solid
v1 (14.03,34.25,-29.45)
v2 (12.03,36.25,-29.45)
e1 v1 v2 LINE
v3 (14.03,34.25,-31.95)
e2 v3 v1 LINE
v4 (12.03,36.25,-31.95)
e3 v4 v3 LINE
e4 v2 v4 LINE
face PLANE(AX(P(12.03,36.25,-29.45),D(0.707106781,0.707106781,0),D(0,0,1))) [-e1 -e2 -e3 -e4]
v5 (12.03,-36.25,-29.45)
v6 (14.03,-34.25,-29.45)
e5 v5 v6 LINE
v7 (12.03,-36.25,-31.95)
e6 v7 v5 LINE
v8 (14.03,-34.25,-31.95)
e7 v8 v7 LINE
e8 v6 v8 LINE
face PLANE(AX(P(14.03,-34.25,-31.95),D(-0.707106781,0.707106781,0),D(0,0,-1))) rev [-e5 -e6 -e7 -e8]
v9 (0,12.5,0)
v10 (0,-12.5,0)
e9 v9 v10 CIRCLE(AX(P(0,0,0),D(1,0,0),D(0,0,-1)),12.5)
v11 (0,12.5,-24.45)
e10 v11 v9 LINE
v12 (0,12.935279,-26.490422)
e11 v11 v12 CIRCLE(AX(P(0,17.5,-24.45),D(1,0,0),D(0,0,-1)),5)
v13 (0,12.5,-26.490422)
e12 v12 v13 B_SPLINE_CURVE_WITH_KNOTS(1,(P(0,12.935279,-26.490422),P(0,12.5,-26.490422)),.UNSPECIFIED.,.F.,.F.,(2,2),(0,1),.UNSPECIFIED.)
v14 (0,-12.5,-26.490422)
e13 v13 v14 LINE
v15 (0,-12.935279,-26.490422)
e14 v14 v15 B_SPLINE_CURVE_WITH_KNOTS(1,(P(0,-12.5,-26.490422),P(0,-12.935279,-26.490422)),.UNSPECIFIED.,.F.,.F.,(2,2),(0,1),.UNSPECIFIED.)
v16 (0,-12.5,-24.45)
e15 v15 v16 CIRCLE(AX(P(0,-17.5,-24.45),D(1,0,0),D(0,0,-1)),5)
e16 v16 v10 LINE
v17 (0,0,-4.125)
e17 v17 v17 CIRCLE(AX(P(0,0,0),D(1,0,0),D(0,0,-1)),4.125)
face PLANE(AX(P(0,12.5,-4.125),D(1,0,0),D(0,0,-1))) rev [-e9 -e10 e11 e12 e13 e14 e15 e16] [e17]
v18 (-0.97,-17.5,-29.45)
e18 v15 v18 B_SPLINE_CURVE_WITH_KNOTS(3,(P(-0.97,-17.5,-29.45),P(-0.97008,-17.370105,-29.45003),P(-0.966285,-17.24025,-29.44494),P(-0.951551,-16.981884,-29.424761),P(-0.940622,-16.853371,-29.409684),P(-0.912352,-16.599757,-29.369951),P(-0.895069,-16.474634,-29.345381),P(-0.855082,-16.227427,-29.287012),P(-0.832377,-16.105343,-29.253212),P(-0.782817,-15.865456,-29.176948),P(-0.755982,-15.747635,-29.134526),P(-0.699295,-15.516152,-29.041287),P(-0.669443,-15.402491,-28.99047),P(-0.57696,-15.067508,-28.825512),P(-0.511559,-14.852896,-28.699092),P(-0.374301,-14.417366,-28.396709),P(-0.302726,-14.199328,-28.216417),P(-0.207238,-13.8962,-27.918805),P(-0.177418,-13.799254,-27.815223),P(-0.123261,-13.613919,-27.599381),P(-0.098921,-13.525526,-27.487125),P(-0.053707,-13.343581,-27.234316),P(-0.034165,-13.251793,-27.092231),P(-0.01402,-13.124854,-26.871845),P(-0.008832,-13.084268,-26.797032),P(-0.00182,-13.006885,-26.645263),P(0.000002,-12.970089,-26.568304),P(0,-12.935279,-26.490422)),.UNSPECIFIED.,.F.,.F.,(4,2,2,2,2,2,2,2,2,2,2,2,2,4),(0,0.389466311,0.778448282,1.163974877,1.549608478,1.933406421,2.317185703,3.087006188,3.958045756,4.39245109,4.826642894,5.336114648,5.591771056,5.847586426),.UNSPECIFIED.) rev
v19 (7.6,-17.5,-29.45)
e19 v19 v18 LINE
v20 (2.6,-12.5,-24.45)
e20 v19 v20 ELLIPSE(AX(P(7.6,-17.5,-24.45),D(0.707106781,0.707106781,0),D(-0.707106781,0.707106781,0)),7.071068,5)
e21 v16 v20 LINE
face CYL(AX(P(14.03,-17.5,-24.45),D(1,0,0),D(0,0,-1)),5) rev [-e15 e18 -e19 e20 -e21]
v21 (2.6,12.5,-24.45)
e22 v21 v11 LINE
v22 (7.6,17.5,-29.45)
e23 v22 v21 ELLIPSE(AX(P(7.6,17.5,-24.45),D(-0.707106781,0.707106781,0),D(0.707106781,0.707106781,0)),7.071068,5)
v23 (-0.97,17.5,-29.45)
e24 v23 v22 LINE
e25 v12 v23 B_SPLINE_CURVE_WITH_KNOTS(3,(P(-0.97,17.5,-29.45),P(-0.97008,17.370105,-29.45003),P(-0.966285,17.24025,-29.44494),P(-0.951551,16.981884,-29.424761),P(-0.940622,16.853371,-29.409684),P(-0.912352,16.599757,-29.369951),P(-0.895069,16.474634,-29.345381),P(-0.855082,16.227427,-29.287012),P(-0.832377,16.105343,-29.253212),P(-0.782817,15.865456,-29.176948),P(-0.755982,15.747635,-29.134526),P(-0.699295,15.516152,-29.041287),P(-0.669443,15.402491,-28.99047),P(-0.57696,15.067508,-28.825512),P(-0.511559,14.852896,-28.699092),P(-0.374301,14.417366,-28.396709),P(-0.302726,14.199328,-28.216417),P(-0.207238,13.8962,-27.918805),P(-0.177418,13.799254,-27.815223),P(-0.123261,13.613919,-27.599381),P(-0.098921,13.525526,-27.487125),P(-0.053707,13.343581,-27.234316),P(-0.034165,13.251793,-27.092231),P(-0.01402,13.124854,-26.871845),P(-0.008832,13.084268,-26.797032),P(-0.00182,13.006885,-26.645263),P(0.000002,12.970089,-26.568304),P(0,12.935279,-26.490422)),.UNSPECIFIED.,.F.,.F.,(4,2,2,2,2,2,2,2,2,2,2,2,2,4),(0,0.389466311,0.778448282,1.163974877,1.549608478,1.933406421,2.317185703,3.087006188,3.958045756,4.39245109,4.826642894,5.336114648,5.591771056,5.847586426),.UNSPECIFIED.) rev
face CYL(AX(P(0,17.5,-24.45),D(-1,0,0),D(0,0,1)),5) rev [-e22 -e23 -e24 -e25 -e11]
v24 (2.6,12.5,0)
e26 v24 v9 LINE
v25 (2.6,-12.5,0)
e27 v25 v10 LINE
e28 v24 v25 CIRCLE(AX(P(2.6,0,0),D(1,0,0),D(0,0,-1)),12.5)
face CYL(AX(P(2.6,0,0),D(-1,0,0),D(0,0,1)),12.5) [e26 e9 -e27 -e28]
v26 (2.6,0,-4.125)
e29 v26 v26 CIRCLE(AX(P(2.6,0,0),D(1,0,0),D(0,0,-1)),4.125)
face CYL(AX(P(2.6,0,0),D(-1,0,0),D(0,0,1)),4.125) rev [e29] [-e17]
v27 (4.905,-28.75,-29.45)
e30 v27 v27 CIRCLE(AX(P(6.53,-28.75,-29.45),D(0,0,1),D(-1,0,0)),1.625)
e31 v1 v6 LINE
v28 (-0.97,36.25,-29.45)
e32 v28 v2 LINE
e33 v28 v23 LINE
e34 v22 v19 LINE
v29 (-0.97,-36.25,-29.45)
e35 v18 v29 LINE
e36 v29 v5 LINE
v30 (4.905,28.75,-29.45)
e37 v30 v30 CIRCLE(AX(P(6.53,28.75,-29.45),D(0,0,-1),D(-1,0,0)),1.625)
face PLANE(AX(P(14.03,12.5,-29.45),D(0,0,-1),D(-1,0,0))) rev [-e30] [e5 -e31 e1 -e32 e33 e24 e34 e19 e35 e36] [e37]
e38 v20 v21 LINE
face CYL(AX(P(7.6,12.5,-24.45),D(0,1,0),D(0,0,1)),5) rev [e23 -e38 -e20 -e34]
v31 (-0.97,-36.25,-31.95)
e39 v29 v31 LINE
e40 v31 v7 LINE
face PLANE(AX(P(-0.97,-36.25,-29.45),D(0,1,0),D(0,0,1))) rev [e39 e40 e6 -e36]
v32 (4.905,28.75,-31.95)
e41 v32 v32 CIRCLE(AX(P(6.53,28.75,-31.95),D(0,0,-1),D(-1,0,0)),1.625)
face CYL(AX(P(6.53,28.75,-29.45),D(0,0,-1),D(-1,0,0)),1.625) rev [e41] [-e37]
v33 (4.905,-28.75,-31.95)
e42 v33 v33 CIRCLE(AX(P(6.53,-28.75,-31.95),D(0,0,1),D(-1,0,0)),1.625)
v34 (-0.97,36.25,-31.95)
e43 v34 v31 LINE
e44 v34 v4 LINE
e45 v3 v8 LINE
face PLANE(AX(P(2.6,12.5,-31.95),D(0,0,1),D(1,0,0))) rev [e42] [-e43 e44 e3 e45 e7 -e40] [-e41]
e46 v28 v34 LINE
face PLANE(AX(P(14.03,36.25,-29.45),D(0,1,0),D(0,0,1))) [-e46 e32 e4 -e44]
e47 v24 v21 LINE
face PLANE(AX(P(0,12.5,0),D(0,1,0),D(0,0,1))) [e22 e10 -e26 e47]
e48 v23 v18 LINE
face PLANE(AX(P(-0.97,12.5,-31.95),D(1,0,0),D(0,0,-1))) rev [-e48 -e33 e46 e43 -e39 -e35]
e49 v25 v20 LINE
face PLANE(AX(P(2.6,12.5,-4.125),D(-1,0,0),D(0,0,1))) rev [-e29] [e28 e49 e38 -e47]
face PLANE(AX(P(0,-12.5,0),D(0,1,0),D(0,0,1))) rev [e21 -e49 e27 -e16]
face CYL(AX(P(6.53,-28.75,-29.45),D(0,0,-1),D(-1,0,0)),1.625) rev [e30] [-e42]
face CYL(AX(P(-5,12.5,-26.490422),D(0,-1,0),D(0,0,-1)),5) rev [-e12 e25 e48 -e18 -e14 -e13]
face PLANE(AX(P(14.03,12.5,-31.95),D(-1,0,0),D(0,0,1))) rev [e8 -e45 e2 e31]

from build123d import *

# Parameters (mm, degrees)
SKETCH1_R               = 4.125
BOSS_EXTRUDE1_DEPTH     = 2.6
BOSS_EXTRUDE4_DEPTH     = 2.5
CUT_EXTRUDE2_REACH      = 80.314
SKETCH7_W               = 7
SKETCH7_H               = 16.5
SKETCH7_W_2             = 16
SKETCH7_H_2             = 8
CUT_EXTRUDE3_REACH      = 82.041
SKETCH9_W               = 2.6
SKETCH9_H               = 22.388822383
SKETCH8_W               = 2.6
SKETCH8_H               = 27.825
BOSS_EXTRUDE5_DEPTH     = 12.5
FILLET2_R               = 1
FILLET3_R               = 4
CUT_EXTRUDE4_DEPTH      = 74.103052287
CUT_EXTRUDE4_DEPTH_BACK = 74.103052287
SKETCH10_W              = 78.235731334
SKETCH10_H              = 6.290045588
SKETCH11_W              = 15
SKETCH11_H              = 2.5
BOSS_EXTRUDE6_DEPTH     = 12.5
BOSS_EXTRUDE7_DEPTH     = 2.5
SKETCH14_R              = 1.625
CUT_EXTRUDE5_DEPTH      = 2.5
FILLET4_R               = 5
CHAMFER1_SIZE           = 2


with BuildPart() as part:
    # Sketch1 → Boss-Extrude1 (new body)
    with BuildSketch(Plane(origin=(0, 0, 0), x_dir=(0, 0, -1), z_dir=(1, 0, 0))):
        with BuildLine():
            Line((0, 12.5), (34.45, 12.5))
            Line((34.45, 12.5), (34.45, -12.5))
            Line((34.45, -12.5), (0, -12.5))
            ThreePointArc((0, -12.5), (-12.5, 0), (0, 12.5))
        make_face()
        Circle(SKETCH1_R, mode=Mode.SUBTRACT)
    extrude(amount=BOSS_EXTRUDE1_DEPTH)

    # Sketch6 → Boss-Extrude4 (add)
    with BuildSketch(Plane(origin=(0, 0, -34.45), x_dir=(-1, 0, 0), z_dir=(0, 0, -1))):
        Polygon((-8.812505246, 36.25), (53.321583376, 36.25), (53.321583376, -36.25), (6.25, -36.25), (-19.178416624, -36.25), (-19.178416624, 36.25), align=None)
    extrude(amount=-BOSS_EXTRUDE4_DEPTH)

    # Sketch7 → Cut-Extrude2 (cut, up to next)
    with BuildSketch(Plane.XY.offset(-31.95), mode=Mode.PRIVATE) as cut_extrude2_sk1:
        with Locations((-1.711858899, -11.632438111)):
            Rectangle(SKETCH7_W, SKETCH7_H)
    cut_extrude2_tool1 = extrude(cut_extrude2_sk1.sketch, amount=-CUT_EXTRUDE2_REACH, mode=Mode.PRIVATE) & part.part
    # Sketch7 → Cut-Extrude2 (cut, up to next)
    with BuildSketch(Plane.XY.offset(-31.95), mode=Mode.PRIVATE) as cut_extrude2_sk2:
        with Locations((-16.5, 0)):
            Rectangle(SKETCH7_W_2, SKETCH7_H_2)
    cut_extrude2_tool2 = extrude(cut_extrude2_sk2.sketch, amount=-CUT_EXTRUDE2_REACH, mode=Mode.PRIVATE) & part.part
    add(cut_extrude2_tool1.solids().sort_by_distance((-1.711859, -11.632438, -31.95))[0], mode=Mode.SUBTRACT)
    add(cut_extrude2_tool2.solids().sort_by_distance((-16.5, 0, -31.95))[0], mode=Mode.SUBTRACT)

    # Sketch9 → Cut-Extrude3 (cut, up to next)
    with BuildSketch(Plane.XZ.offset(12.5), mode=Mode.PRIVATE) as cut_extrude3_sk1:
        with Locations((1.3, -20.755588809)):
            Rectangle(SKETCH9_W, SKETCH9_H)
    cut_extrude3_tool1 = extrude(cut_extrude3_sk1.sketch, amount=-CUT_EXTRUDE3_REACH, mode=Mode.PRIVATE) & part.part
    add(cut_extrude3_tool1.solids().sort_by_distance((1.3, -12.5, -20.755589))[0], mode=Mode.SUBTRACT)


with BuildPart() as cut_extrude3_piece_1:
    # of the separate pieces the step leaves, piece 1, a body of its own (cut_extrude3_pieces)
    add(part.part.solids().sort_by_distance((-53.321583376, 36.25, -31.95))[0])



with BuildPart() as cut_extrude3_piece_2:
    # of the separate pieces the step leaves, piece 2, a body of its own (cut_extrude3_pieces)
    add(part.part.solids().sort_by_distance((0, 12.5, 0))[0])


with BuildPart() as cut_extrude3_piece_1_1:
    add(cut_extrude3_piece_1.part)

    add(cut_extrude3_piece_2.part)  # Boss-Extrude5 merges Cut-Extrude3 piece 2
    # Sketch8 → Boss-Extrude5 (add, symmetric)
    with BuildSketch(Plane(origin=(0, 0, 0), x_dir=(1, 0, 0), z_dir=(0, 1, 0))):
        with Locations((1.3, 18.0375)):
            Rectangle(SKETCH8_W, SKETCH8_H)
    extrude(amount=BOSS_EXTRUDE5_DEPTH, both=True)

    # Fillet2
    fillet2_edges = [cut_extrude3_piece_1_1.edges().sort_by_distance(p)[0] for p in [
        (-8.5, 4, -33.2),
        (-8.5, -4, -33.2),
        (-24.5, -4, -33.2),
        (-24.5, 4, -33.2),
        (-5.211858899, -19.882438111, -33.2),
        (-5.211858899, -3.382438111, -33.2),
        (1.788141101, -3.382438111, -33.2),
        (1.788141101, -19.882438111, -33.2),
    ]]
    fillet(fillet2_edges, radius=FILLET2_R)

    # Fillet3
    fillet3_edges = [cut_extrude3_piece_1_1.edges().sort_by_distance(p)[0] for p in [
        (19.178416624, 36.25, -33.2),
        (-53.321583376, 36.25, -33.2),
        (-53.321583376, -36.25, -33.2),
        (19.178416624, -36.25, -33.2),
    ]]
    fillet(fillet3_edges, radius=FILLET3_R)

    # Sketch10 → Cut-Extrude4 (cut, two sides: drawn at the far end of the back side and taken through both)
    with BuildSketch(Plane(origin=(0, 0, 0), x_dir=(1, 0, 0), z_dir=(0, 1, 0)).offset(-CUT_EXTRUDE4_DEPTH_BACK)):
        with Locations((-17.391929865, 35.095022794)):
            Rectangle(SKETCH10_W, SKETCH10_H)
    extrude(amount=CUT_EXTRUDE4_DEPTH + CUT_EXTRUDE4_DEPTH_BACK, mode=Mode.SUBTRACT)

    # Sketch11 → Boss-Extrude6 (add, symmetric)
    with BuildSketch(Plane(origin=(0, 0, 0), x_dir=(1, 0, 0), z_dir=(0, 1, 0))):
        with Locations((6.53, 30.7)):
            Rectangle(SKETCH11_W, SKETCH11_H)
    boss_extrude6 = extrude(amount=BOSS_EXTRUDE6_DEPTH, both=True)

    # Sketch13 → Boss-Extrude7 (add)
    with BuildSketch(Plane(origin=(0, 0, -31.95), x_dir=(-1, 0, 0), z_dir=(0, 0, -1))):
        Polygon((-14.03, 12.5), (0.97, 12.5), (0.97, 36.25), (-10.03, 36.25), (-14.03, 36.25), (-14.03, 32.25), align=None)
    boss_extrude7 = extrude(amount=-BOSS_EXTRUDE7_DEPTH)

    # Mirror1: Boss-Extrude6, Boss-Extrude7 across plane
    add(boss_extrude6.mirror(Plane.ZX))
    add(boss_extrude7.mirror(Plane.ZX))

    # Sketch14 → Cut-Extrude5 (cut)
    with BuildSketch(Plane(origin=(0, 0, -31.95), x_dir=(-1, 0, 0), z_dir=(0, 0, -1))):
        with Locations((-6.53, 28.75)):
            Circle(SKETCH14_R)
    cut_extrude5 = extrude(amount=-CUT_EXTRUDE5_DEPTH, mode=Mode.SUBTRACT)

    # Mirror2: Cut-Extrude5 across plane
    add(cut_extrude5.mirror(Plane.ZX), mode=Mode.SUBTRACT)

    # Fillet4
    # the kernel refuses this fillet: 5 mm, written as the material it adds along each edge
    with BuildSketch(Plane(origin=(2.6, -12.5, -29.45), x_dir=(1, 0, 0), z_dir=(0, 1, 0))) as fillet4_piece_1:
        with BuildLine():
            CenterArc((FILLET4_R, -FILLET4_R), FILLET4_R, 90, 90)
            Line((0, -FILLET4_R), (-FILLET4_R * 0.02, -FILLET4_R))
            Line((-FILLET4_R * 0.02, -FILLET4_R), (-FILLET4_R * 0.02, FILLET4_R * 0.02))
            Line((-FILLET4_R * 0.02, FILLET4_R * 0.02), (FILLET4_R, FILLET4_R * 0.02))
            Line((FILLET4_R, FILLET4_R * 0.02), (FILLET4_R, 0))
        make_face()
    extrude(amount=25)
    with BuildSketch(Plane(origin=(0, -12.5, -29.45), x_dir=(-1, 0, 0), z_dir=(0, 1, 0))) as fillet4_piece_2:
        with BuildLine():
            CenterArc((5, 2.959577673), FILLET4_R, 180, 36.293058493)
            Line((0, 2.959577673), (-0.1, 2.959577673))
            Line((-0.1, 2.959577673), (-0.1, 0))
            Line((-0.1, 0), (0, -0.1))
            ThreePointArc((0, -0.1), (0.485, -0.1), (0.8894, -0.059191553))
            Line((0.8894, -0.059191553), (0.97, 0))
        make_face()
    extrude(amount=25)
    with BuildSketch(Plane(origin=(2.6, 12.5, -29.45), x_dir=(0, 0, 1), z_dir=(-1, 0, 0)), Plane(origin=(2.6, -12.5, -29.45), x_dir=(0, -1, 0), z_dir=(-1, 0, 0))) as fillet4_piece_3:
        with BuildLine():
            CenterArc((FILLET4_R, FILLET4_R), FILLET4_R, 180, 90)
            Line((0, FILLET4_R), (-FILLET4_R * 0.02, FILLET4_R))
            Line((-FILLET4_R * 0.02, FILLET4_R), (-FILLET4_R * 0.02, -FILLET4_R * 0.02))
            Line((-FILLET4_R * 0.02, -FILLET4_R * 0.02), (FILLET4_R, -FILLET4_R * 0.02))
            Line((FILLET4_R, -FILLET4_R * 0.02), (FILLET4_R, 0))
        make_face()
    extrude(amount=2.6)
    with BuildSketch(Plane(origin=(2.6, -25, -29.45), x_dir=(1, 0, 0), z_dir=(0, 1, 0))) as fillet4_piece_4a_section:
        with BuildLine():
            CenterArc((FILLET4_R, -FILLET4_R), FILLET4_R, 90, 90)
            Line((0, -FILLET4_R), (-FILLET4_R * 0.02, -FILLET4_R))
            Line((-FILLET4_R * 0.02, -FILLET4_R), (-FILLET4_R * 0.02, FILLET4_R * 0.02))
            Line((-FILLET4_R * 0.02, FILLET4_R * 0.02), (FILLET4_R, FILLET4_R * 0.02))
            Line((FILLET4_R, FILLET4_R * 0.02), (FILLET4_R, 0))
        make_face()
    fillet4_piece_4a = extrude(amount=37.5, mode=Mode.PRIVATE)
    fillet4_piece_4a = split(fillet4_piece_4a, bisect_by=Plane(origin=(3.731975571, -12.5, -28.318024429), z_dir=(0, -1, 0)), keep=Keep.TOP, mode=Mode.PRIVATE)
    with BuildSketch(Plane(origin=(15.1, -12.5, -29.45), x_dir=(0, -1, 0), z_dir=(-1, 0, 0))) as fillet4_piece_4b_section:
        with BuildLine():
            CenterArc((FILLET4_R, FILLET4_R), FILLET4_R, 180, 90)
            Line((0, FILLET4_R), (-FILLET4_R * 0.02, FILLET4_R))
            Line((-FILLET4_R * 0.02, FILLET4_R), (-FILLET4_R * 0.02, -FILLET4_R * 0.02))
            Line((-FILLET4_R * 0.02, -FILLET4_R * 0.02), (FILLET4_R, -FILLET4_R * 0.02))
            Line((FILLET4_R, -FILLET4_R * 0.02), (FILLET4_R, 0))
        make_face()
    fillet4_piece_4b = extrude(amount=15.1, mode=Mode.PRIVATE)
    fillet4_piece_4b = split(fillet4_piece_4b, bisect_by=Plane(origin=(14.03, -13.631975571, -28.318024429), z_dir=(-1, 0, 0)), keep=Keep.TOP, mode=Mode.PRIVATE)
    fillet4_piece_4b = split(fillet4_piece_4b, bisect_by=Plane(origin=(2.6, -13.631975571, -28.318024429), z_dir=(1, 0, 0)), keep=Keep.TOP, mode=Mode.PRIVATE)
    fillet4_piece_4 = fillet4_piece_4a & fillet4_piece_4b
    add(fillet4_piece_4)
    with BuildSketch(Plane(origin=(15.1, 12.5, -29.45), x_dir=(0, 0, 1), z_dir=(-1, 0, 0))) as fillet4_piece_5a_section:
        with BuildLine():
            CenterArc((FILLET4_R, FILLET4_R), FILLET4_R, 180, 90)
            Line((0, FILLET4_R), (-FILLET4_R * 0.02, FILLET4_R))
            Line((-FILLET4_R * 0.02, FILLET4_R), (-FILLET4_R * 0.02, -FILLET4_R * 0.02))
            Line((-FILLET4_R * 0.02, -FILLET4_R * 0.02), (FILLET4_R, -FILLET4_R * 0.02))
            Line((FILLET4_R, -FILLET4_R * 0.02), (FILLET4_R, 0))
        make_face()
    fillet4_piece_5a = extrude(amount=15.1, mode=Mode.PRIVATE)
    fillet4_piece_5a = split(fillet4_piece_5a, bisect_by=Plane(origin=(2.6, 13.631975571, -28.318024429), z_dir=(1, 0, 0)), keep=Keep.TOP, mode=Mode.PRIVATE)
    fillet4_piece_5a = split(fillet4_piece_5a, bisect_by=Plane(origin=(14.03, 13.631975571, -28.318024429), z_dir=(-1, 0, 0)), keep=Keep.TOP, mode=Mode.PRIVATE)
    with BuildSketch(Plane(origin=(2.6, -12.5, -29.45), x_dir=(1, 0, 0), z_dir=(0, 1, 0))) as fillet4_piece_5b_section:
        with BuildLine():
            CenterArc((FILLET4_R, -FILLET4_R), FILLET4_R, 90, 90)
            Line((0, -FILLET4_R), (-FILLET4_R * 0.02, -FILLET4_R))
            Line((-FILLET4_R * 0.02, -FILLET4_R), (-FILLET4_R * 0.02, FILLET4_R * 0.02))
            Line((-FILLET4_R * 0.02, FILLET4_R * 0.02), (FILLET4_R, FILLET4_R * 0.02))
            Line((FILLET4_R, FILLET4_R * 0.02), (FILLET4_R, 0))
        make_face()
    fillet4_piece_5b = extrude(amount=37.5, mode=Mode.PRIVATE)
    fillet4_piece_5b = split(fillet4_piece_5b, bisect_by=Plane(origin=(3.731975571, 12.5, -28.318024429), z_dir=(0, 1, 0)), keep=Keep.TOP, mode=Mode.PRIVATE)
    fillet4_piece_5 = fillet4_piece_5a & fillet4_piece_5b
    add(fillet4_piece_5)
    with BuildSketch(Plane(origin=(2.6, -12.5, -29.45), x_dir=(0, -1, 0), z_dir=(-1, 0, 0))) as fillet4_piece_6a_section:
        with BuildLine():
            CenterArc((FILLET4_R, FILLET4_R), FILLET4_R, 180, 90)
            Line((0, FILLET4_R), (-FILLET4_R * 0.02, FILLET4_R))
            Line((-FILLET4_R * 0.02, FILLET4_R), (-FILLET4_R * 0.02, -FILLET4_R * 0.02))
            Line((-FILLET4_R * 0.02, -FILLET4_R * 0.02), (FILLET4_R, -FILLET4_R * 0.02))
            Line((FILLET4_R, -FILLET4_R * 0.02), (FILLET4_R, 0))
        make_face()
    fillet4_piece_6a = extrude(amount=15.1, mode=Mode.PRIVATE)
    fillet4_piece_6a = split(fillet4_piece_6a, bisect_by=Plane(origin=(-0.97, -13.631975571, -28.318024429), z_dir=(1, 0, 0)), keep=Keep.TOP, mode=Mode.PRIVATE)
    fillet4_piece_6a = split(fillet4_piece_6a, bisect_by=Plane(origin=(0, -13.631975571, -28.318024429), z_dir=(-1, 0, 0)), keep=Keep.TOP, mode=Mode.PRIVATE)
    with BuildSketch(Plane(origin=(0, -19.898944181, -29.45), x_dir=(-1, 0, 0), z_dir=(0, 1, 0))) as fillet4_piece_6b_section:
        with BuildLine():
            CenterArc((5, 2.959577673), FILLET4_R, 180, 36.293058493)
            Line((0, 2.959577673), (-0.1, 2.959577673))
            Line((-0.1, 2.959577673), (-0.1, 0))
            Line((-0.1, 0), (0, -0.1))
            ThreePointArc((0, -0.1), (0.485, -0.1), (0.8894, -0.059191553))
            Line((0.8894, -0.059191553), (0.97, 0))
        make_face()
    fillet4_piece_6b = extrude(amount=32.398944181, mode=Mode.PRIVATE)
    fillet4_piece_6b = split(fillet4_piece_6b, bisect_by=Plane(origin=(-0.217435867, -12.5, -28.607978011), z_dir=(0, -1, 0)), keep=Keep.TOP, mode=Mode.PRIVATE)
    fillet4_piece_6 = fillet4_piece_6a & fillet4_piece_6b
    add(fillet4_piece_6)
    with BuildSketch(Plane(origin=(2.6, 12.5, -29.45), x_dir=(0, 0, 1), z_dir=(-1, 0, 0))) as fillet4_piece_7a_section:
        with BuildLine():
            CenterArc((FILLET4_R, FILLET4_R), FILLET4_R, 180, 90)
            Line((0, FILLET4_R), (-FILLET4_R * 0.02, FILLET4_R))
            Line((-FILLET4_R * 0.02, FILLET4_R), (-FILLET4_R * 0.02, -FILLET4_R * 0.02))
            Line((-FILLET4_R * 0.02, -FILLET4_R * 0.02), (FILLET4_R, -FILLET4_R * 0.02))
            Line((FILLET4_R, -FILLET4_R * 0.02), (FILLET4_R, 0))
        make_face()
    fillet4_piece_7a = extrude(amount=15.1, mode=Mode.PRIVATE)
    fillet4_piece_7a = split(fillet4_piece_7a, bisect_by=Plane(origin=(0, 13.631975571, -28.318024429), z_dir=(-1, 0, 0)), keep=Keep.TOP, mode=Mode.PRIVATE)
    fillet4_piece_7a = split(fillet4_piece_7a, bisect_by=Plane(origin=(-0.97, 13.631975571, -28.318024429), z_dir=(1, 0, 0)), keep=Keep.TOP, mode=Mode.PRIVATE)
    with BuildSketch(Plane(origin=(0, -12.5, -29.45), x_dir=(-1, 0, 0), z_dir=(0, 1, 0))) as fillet4_piece_7b_section:
        with BuildLine():
            CenterArc((5, 2.959577673), FILLET4_R, 180, 36.293058493)
            Line((0, 2.959577673), (-0.1, 2.959577673))
            Line((-0.1, 2.959577673), (-0.1, 0))
            Line((-0.1, 0), (0, -0.1))
            ThreePointArc((0, -0.1), (0.485, -0.1), (0.8894, -0.059191553))
            Line((0.8894, -0.059191553), (0.97, 0))
        make_face()
    fillet4_piece_7b = extrude(amount=32.398944181, mode=Mode.PRIVATE)
    fillet4_piece_7b = split(fillet4_piece_7b, bisect_by=Plane(origin=(-0.217435867, 12.5, -28.607978011), z_dir=(0, 1, 0)), keep=Keep.TOP, mode=Mode.PRIVATE)
    fillet4_piece_7 = fillet4_piece_7a & fillet4_piece_7b
    add(fillet4_piece_7)

    # Chamfer1
    chamfer1_edges = [cut_extrude3_piece_1_1.edges().sort_by_distance(p)[0] for p in [
        (14.03, 36.25, -30.7),
        (14.03, -36.25, -30.7),
    ]]
    chamfer(chamfer1_edges, length=CHAMFER1_SIZE)


solid = cut_extrude3_piece_1_1.part
